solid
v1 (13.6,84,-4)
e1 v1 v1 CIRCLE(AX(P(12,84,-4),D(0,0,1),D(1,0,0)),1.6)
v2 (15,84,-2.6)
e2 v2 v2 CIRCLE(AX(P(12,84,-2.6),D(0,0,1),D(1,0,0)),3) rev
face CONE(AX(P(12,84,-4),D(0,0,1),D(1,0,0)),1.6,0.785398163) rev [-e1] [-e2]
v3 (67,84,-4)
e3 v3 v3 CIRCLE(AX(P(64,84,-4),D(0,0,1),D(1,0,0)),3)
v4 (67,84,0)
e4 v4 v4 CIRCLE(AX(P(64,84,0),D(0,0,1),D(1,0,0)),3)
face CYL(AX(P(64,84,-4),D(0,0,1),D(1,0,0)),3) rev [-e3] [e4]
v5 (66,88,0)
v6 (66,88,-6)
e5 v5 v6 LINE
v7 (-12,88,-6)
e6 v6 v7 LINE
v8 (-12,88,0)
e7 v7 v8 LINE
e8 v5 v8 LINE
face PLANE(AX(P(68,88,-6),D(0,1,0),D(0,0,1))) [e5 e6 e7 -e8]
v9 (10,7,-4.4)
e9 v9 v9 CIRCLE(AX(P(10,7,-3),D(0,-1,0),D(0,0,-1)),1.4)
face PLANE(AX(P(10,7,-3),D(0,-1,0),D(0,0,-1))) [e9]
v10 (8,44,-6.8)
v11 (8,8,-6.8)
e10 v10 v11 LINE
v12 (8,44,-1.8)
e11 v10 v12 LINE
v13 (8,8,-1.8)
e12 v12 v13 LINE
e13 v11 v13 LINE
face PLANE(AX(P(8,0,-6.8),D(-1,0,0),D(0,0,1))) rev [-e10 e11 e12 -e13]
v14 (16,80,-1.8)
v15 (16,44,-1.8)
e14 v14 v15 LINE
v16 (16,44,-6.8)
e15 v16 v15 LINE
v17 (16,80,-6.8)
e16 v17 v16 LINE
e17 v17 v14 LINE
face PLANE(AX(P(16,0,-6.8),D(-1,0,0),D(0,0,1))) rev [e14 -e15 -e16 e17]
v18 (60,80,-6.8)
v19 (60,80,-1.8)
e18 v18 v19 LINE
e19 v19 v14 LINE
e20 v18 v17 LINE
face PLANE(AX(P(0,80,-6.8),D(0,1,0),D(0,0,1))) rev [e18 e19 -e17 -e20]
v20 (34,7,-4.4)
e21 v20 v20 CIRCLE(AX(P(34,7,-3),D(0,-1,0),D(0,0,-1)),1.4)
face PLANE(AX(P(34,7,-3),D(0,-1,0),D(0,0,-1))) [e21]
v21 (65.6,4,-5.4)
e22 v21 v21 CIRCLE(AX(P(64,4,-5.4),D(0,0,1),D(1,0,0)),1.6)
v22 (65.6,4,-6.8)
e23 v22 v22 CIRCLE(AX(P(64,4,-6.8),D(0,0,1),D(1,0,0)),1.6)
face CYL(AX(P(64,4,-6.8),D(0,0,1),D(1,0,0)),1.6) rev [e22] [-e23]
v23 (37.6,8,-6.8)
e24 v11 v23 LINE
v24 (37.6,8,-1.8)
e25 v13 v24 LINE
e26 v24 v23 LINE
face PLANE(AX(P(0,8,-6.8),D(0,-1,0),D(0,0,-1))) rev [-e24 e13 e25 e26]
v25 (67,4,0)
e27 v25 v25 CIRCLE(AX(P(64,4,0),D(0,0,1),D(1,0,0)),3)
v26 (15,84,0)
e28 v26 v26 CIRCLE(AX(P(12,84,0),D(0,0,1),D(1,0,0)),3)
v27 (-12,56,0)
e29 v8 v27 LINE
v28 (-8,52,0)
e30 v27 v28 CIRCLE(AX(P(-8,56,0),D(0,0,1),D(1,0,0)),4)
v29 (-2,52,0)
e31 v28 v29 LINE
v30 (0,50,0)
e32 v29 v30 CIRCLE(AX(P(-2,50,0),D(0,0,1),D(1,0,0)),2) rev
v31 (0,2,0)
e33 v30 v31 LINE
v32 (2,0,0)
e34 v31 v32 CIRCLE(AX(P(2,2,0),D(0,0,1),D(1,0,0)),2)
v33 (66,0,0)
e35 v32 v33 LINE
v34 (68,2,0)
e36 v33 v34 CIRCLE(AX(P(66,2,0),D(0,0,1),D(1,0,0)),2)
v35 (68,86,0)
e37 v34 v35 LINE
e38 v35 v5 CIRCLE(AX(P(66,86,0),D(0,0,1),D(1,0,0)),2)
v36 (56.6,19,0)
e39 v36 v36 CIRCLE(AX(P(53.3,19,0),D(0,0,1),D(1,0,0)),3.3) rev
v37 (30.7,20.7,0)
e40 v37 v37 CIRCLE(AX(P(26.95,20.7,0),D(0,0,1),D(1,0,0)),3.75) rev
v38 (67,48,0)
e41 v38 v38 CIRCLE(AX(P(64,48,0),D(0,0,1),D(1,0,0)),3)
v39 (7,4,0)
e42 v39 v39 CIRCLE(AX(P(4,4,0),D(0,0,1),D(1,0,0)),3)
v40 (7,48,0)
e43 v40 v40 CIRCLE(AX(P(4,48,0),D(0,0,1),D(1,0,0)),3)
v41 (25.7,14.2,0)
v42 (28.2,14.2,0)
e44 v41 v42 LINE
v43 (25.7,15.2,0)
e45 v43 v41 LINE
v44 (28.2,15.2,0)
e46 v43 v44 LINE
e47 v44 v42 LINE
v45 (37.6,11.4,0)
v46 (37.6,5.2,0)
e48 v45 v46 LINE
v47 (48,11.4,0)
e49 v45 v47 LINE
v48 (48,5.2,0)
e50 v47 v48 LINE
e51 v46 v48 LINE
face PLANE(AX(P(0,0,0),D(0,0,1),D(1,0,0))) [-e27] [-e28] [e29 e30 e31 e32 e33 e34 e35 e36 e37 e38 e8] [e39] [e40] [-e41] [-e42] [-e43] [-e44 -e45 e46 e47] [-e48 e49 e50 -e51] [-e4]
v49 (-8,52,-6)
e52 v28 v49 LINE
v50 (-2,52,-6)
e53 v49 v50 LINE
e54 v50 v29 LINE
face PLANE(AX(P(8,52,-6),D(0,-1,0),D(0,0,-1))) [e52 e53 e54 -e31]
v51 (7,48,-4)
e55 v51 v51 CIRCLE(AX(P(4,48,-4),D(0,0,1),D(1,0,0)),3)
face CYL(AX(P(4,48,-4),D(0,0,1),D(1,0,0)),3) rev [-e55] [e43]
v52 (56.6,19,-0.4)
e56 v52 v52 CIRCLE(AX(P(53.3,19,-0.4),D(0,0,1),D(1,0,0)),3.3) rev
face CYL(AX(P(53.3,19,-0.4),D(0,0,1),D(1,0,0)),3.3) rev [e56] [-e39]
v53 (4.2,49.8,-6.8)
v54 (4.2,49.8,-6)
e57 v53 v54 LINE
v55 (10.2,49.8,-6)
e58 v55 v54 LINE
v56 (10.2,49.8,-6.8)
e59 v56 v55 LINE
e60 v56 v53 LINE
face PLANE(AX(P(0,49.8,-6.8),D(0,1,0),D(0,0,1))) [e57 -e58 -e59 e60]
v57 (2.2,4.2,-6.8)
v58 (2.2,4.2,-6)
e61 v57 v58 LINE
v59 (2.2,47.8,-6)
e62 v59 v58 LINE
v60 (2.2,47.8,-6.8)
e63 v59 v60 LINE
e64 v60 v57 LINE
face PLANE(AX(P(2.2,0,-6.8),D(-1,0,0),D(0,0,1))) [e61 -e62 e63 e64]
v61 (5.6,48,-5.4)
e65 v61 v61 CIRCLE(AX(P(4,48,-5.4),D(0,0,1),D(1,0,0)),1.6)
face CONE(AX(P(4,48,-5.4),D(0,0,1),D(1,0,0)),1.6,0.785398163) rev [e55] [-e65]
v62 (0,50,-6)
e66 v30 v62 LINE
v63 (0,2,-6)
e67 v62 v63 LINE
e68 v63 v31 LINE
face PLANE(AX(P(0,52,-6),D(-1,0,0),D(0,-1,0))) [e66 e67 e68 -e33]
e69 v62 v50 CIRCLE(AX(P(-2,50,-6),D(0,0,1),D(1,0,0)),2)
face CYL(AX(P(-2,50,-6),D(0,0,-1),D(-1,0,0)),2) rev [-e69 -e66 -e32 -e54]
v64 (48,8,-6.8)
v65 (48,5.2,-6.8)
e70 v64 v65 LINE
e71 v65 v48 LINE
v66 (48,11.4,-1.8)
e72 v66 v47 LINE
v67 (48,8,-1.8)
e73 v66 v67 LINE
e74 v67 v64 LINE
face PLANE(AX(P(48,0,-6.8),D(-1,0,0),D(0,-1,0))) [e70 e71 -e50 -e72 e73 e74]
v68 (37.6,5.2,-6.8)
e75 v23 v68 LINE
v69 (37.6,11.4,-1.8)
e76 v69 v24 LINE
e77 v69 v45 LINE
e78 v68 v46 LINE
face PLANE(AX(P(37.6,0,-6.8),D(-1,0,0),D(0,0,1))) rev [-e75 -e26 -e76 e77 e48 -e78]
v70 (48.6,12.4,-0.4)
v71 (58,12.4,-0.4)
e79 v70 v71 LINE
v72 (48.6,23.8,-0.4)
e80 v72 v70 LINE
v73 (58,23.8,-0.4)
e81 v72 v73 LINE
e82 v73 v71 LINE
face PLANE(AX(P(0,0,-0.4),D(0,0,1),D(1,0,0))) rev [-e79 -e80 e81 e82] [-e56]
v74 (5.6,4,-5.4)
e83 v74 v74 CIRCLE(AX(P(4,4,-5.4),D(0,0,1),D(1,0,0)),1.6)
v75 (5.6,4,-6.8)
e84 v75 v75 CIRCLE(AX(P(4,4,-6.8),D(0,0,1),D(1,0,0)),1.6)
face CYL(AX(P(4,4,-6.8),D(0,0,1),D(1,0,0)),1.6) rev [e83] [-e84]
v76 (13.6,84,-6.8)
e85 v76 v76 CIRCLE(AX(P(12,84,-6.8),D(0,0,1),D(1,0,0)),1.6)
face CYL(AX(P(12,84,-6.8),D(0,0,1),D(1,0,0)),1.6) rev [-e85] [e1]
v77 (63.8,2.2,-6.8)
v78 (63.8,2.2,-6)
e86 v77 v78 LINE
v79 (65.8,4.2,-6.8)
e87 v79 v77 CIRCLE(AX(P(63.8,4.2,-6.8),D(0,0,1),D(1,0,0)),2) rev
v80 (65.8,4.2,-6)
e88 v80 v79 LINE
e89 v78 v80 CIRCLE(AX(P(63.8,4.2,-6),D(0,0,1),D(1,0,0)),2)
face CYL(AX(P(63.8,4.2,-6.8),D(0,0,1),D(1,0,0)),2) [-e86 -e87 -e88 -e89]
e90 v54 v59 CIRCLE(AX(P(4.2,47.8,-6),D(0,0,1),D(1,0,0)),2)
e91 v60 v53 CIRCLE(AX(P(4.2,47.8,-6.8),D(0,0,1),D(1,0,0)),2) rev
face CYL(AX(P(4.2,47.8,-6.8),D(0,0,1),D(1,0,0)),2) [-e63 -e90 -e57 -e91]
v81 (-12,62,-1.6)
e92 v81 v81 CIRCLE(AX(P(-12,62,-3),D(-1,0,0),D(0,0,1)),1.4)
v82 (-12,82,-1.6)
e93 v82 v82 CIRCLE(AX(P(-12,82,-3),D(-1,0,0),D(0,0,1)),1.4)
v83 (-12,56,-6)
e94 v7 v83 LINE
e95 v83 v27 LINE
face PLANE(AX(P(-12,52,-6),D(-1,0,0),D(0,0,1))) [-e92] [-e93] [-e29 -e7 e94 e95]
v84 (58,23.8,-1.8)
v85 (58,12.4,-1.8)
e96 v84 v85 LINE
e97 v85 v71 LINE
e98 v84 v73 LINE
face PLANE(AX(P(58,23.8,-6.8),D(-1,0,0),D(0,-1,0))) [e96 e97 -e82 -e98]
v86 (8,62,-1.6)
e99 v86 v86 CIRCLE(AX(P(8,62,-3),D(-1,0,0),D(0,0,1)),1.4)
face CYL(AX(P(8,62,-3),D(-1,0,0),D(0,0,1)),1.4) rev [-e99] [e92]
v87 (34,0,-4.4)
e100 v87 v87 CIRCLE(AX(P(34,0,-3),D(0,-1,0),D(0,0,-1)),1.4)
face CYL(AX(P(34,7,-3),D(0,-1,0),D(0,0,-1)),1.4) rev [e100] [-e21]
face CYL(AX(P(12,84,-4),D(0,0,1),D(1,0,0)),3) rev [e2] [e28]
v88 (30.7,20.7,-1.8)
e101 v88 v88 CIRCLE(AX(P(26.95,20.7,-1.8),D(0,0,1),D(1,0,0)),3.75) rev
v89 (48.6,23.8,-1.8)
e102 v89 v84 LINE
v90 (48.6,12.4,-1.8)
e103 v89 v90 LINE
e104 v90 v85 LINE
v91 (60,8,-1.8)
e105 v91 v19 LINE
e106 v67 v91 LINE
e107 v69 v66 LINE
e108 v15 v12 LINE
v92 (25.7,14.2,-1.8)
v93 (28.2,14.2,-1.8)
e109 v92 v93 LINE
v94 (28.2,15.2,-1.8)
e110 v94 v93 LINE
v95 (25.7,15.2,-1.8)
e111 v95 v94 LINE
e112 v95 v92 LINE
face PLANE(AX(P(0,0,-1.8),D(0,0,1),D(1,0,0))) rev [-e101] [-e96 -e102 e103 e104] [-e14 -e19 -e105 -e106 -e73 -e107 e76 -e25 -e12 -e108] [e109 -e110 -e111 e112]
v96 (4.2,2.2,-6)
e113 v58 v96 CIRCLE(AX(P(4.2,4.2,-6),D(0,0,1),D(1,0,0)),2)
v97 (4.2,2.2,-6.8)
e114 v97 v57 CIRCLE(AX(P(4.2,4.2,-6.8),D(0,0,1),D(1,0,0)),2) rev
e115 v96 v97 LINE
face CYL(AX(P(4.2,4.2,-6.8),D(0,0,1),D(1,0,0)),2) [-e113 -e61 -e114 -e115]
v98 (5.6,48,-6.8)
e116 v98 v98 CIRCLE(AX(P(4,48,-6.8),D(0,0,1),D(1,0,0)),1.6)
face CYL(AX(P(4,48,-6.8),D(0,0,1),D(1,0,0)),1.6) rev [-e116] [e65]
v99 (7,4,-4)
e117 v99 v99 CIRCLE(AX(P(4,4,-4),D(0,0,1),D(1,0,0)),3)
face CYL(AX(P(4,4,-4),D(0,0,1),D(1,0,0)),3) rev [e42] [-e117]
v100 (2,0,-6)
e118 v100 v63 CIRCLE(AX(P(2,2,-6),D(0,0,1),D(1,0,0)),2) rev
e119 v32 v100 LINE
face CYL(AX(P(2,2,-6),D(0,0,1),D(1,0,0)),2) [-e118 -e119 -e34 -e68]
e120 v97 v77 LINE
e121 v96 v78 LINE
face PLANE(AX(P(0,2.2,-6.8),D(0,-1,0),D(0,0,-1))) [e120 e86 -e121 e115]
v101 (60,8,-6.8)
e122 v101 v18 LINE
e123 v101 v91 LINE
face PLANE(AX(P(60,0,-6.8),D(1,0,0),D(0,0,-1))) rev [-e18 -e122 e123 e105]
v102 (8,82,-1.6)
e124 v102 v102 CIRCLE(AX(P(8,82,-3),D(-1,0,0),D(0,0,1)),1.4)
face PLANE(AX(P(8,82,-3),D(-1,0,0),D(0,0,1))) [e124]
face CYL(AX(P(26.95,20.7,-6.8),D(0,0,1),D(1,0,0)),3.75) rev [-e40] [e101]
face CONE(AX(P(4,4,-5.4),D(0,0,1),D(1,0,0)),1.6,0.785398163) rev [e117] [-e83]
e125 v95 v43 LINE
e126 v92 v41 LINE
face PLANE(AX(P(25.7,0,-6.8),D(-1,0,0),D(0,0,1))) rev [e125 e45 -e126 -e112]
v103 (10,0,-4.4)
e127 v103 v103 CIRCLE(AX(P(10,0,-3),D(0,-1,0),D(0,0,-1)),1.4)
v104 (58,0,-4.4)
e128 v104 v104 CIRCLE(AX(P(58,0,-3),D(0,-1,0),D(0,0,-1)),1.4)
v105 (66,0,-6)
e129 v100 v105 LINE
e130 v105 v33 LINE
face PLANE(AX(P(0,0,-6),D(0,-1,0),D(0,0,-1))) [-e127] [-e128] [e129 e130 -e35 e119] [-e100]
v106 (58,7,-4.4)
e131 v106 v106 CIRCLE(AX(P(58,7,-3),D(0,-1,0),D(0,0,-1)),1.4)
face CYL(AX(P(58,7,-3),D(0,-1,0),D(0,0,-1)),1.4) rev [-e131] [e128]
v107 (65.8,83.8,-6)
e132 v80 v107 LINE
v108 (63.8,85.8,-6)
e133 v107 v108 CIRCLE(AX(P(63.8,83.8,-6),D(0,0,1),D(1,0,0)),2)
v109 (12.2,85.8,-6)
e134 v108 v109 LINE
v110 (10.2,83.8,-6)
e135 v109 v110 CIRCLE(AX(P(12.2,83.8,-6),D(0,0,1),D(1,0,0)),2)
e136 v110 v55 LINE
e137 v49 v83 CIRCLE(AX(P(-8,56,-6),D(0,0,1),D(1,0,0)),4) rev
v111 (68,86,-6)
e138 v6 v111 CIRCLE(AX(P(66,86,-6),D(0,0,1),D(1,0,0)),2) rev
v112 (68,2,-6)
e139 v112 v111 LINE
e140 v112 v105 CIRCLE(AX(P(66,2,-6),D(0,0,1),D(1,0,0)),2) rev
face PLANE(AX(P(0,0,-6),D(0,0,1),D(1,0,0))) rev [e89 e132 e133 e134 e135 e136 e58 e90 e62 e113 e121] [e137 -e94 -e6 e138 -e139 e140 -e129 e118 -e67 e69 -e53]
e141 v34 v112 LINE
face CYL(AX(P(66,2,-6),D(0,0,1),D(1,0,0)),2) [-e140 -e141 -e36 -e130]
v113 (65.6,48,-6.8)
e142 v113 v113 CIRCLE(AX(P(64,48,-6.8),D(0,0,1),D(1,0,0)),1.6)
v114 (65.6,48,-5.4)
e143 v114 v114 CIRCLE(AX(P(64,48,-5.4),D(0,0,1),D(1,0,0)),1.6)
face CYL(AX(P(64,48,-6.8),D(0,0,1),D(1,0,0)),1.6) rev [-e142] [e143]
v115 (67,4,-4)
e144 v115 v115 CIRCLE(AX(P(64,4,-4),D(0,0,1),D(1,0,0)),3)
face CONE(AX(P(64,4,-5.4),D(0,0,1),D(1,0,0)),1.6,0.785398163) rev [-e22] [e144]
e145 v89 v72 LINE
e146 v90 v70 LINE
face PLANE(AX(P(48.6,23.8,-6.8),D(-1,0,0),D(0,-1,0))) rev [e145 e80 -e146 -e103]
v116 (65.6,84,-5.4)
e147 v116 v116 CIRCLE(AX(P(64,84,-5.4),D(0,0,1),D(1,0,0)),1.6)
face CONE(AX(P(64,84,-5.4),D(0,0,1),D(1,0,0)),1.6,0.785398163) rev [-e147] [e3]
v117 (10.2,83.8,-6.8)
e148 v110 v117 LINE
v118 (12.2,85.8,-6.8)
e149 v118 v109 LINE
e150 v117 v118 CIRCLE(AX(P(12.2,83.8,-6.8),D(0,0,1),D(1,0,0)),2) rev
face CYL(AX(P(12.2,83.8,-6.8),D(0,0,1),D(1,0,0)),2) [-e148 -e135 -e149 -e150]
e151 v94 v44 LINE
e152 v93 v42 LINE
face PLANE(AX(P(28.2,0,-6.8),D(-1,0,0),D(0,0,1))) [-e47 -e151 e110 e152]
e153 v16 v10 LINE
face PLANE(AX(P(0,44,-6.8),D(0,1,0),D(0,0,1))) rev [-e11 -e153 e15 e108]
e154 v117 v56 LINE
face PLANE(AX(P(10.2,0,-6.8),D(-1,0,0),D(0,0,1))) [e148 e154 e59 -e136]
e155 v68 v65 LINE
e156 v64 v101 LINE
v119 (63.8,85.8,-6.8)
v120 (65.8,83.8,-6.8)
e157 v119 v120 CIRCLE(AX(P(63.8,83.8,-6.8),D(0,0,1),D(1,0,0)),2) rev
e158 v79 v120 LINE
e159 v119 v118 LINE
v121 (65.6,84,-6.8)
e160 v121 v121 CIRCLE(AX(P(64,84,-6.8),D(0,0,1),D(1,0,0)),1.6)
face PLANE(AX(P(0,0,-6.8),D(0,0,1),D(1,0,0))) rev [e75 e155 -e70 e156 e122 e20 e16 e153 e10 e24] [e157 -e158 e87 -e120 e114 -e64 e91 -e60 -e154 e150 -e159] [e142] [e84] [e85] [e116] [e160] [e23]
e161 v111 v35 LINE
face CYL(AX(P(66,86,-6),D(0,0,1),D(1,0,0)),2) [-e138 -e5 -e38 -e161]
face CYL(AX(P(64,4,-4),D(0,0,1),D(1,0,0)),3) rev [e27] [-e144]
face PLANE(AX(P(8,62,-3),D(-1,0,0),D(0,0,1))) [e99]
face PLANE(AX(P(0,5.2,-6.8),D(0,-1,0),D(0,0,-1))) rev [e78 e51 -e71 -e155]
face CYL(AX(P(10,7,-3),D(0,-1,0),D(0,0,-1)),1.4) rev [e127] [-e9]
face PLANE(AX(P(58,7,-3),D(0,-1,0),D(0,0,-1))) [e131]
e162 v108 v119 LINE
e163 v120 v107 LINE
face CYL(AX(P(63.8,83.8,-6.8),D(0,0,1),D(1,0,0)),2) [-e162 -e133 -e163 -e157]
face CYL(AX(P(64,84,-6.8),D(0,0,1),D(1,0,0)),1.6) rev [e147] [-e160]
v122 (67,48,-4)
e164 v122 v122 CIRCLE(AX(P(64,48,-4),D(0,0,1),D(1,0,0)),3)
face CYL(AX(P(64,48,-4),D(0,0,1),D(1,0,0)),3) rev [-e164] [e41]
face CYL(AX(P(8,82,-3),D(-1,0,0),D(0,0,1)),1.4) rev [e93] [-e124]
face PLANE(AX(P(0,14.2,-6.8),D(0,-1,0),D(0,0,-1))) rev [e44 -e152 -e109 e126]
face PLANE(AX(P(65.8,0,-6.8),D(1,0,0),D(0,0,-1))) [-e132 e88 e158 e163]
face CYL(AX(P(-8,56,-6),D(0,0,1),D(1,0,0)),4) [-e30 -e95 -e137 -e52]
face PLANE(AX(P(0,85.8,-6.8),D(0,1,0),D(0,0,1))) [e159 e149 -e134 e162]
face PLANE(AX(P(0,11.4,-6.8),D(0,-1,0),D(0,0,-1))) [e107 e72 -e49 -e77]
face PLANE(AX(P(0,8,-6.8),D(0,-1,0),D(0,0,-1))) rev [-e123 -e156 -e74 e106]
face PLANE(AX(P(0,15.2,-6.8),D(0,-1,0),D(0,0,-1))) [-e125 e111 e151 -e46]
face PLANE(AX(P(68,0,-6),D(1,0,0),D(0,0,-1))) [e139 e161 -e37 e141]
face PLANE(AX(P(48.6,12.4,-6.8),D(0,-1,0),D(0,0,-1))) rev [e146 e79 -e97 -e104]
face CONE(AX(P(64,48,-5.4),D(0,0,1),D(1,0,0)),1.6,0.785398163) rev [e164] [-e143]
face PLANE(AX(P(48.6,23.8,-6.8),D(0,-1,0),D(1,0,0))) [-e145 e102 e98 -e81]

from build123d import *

# Parameters (mm, degrees)
EXTRUDE_1_DEPTH          = 6
EXTRUDE_4_DEPTH          = 6.8
CUT_EXTRUDE_START        = -1.8
CUT_EXTRUDE_6_DEPTH      = 110.619208398
FILLET_1_R               = 2
CUT_EXTRUDE_4_DEPTH      = 112.419208398
CUT_EXTRUDE_4_DEPTH_BACK = 112.419208398
SKETCH_4_R               = 1.6
SKETCH_5_R               = 3.75
SKETCH_5_W               = 10.4
SKETCH_5_H               = 6.2
SKETCH_5_W_2             = 2.5
SKETCH_5_H_2             = 1
SKETCH_5_W_3             = 9.4
SKETCH_5_H_3             = 11.4
CUT_EXTRUDE_5_DEPTH      = 112.419208398
SKETCH_5_3_W             = 9.4
SKETCH_5_3_H             = 11.4
SKETCH_5_3_R             = 3.3
EXTRUDE_5_DEPTH          = 0.4
SKETCH_6_W               = 20
SKETCH_6_H               = 36
EXTRUDE_7_DEPTH          = 6
FILLET_2_R               = 2
FILLET_3_R               = 4
SKETCH_7_R               = 1.4
CUT_EXTRUDE_7_DEPTH      = 20
SKETCH_4_3_R             = 3
SKETCH_4_3_R_2           = 1.6
CUT_EXTRUDE_8_DEPTH      = 4
SKETCH_8_R               = 1.4
CUT_EXTRUDE_9_DEPTH      = 7
CHAMFER_1_SIZE           = 1.4


with BuildPart() as part:
    # 草图1 → 凸台-拉伸1 (new body)
    with BuildSketch(Plane.XY):
        Polygon((0, 0), (68, 0), (68, 88), (8, 88), (8, 52), (0, 52), align=None)
    extrude(amount=-EXTRUDE_1_DEPTH)

    # 草图1<2> → 凸台-拉伸4 (add)
    with BuildSketch(Plane.XY):
        Polygon((2.2, 49.8), (2.2, 2.2), (65.8, 2.2), (65.8, 85.8), (10.2, 85.8), (10.2, 49.8), align=None)
        Polygon((8, 44), (8, 8), (60, 8), (60, 80), (16, 80), (16, 44), align=None, mode=Mode.SUBTRACT)
    extrude(amount=-EXTRUDE_4_DEPTH)

    # 草图1<5> → 切除-拉伸6 (cut, through all)
    with BuildSketch(Plane.XY.offset(CUT_EXTRUDE_START)):
        Polygon((16, 80), (16, 44), (8, 44), (8, 8), (60, 8), (60, 80), align=None)
    extrude(amount=-CUT_EXTRUDE_6_DEPTH, mode=Mode.SUBTRACT)

    # 圆角1
    fillet_1_edges = [part.edges().sort_by_distance(p)[0] for p in [
        (68, 88, -3),
        (68, 0, -3),
        (0, 0, -3),
        (10.2, 85.8, -6.4),
        (65.8, 85.8, -6.4),
        (65.8, 2.2, -6.4),
        (2.2, 2.2, -6.4),
        (2.2, 49.8, -6.4),
    ]]
    fillet(fillet_1_edges, radius=FILLET_1_R)

    # 草图4 → 切除-拉伸4 (cut, two sides: drawn at the far end of the back side and taken through both)
    with BuildSketch(Plane.XY.offset(-CUT_EXTRUDE_4_DEPTH_BACK)):
        with Locations((12, 84)):
            Circle(SKETCH_4_R)
        with Locations((64, 84)):
            Circle(SKETCH_4_R)
        with Locations((64, 4)):
            Circle(SKETCH_4_R)
        with Locations((4, 48)):
            Circle(SKETCH_4_R)
        with Locations((4, 4)):
            Circle(SKETCH_4_R)
        with Locations((64, 48)):
            Circle(SKETCH_4_R)
    extrude(amount=CUT_EXTRUDE_4_DEPTH + CUT_EXTRUDE_4_DEPTH_BACK, mode=Mode.SUBTRACT)

    # 草图5 → 切除-拉伸5 (cut, through all)
    with BuildSketch(Plane.XY):
        with Locations((26.95, 20.7)):
            Circle(SKETCH_5_R)
        with Locations((42.8, 8.3)):
            Rectangle(SKETCH_5_W, SKETCH_5_H)
        with Locations((26.95, 14.7)):
            Rectangle(SKETCH_5_W_2, SKETCH_5_H_2)
        with Locations((53.3, 18.1)):
            Rectangle(SKETCH_5_W_3, SKETCH_5_H_3)
    extrude(amount=-CUT_EXTRUDE_5_DEPTH, mode=Mode.SUBTRACT)

    # 草图5<3> → 凸台-拉伸5 (add)
    with BuildSketch(Plane.XY):
        with Locations((53.3, 18.1)):
            Rectangle(SKETCH_5_3_W, SKETCH_5_3_H)
        with Locations((53.3, 19)):
            Circle(SKETCH_5_3_R, mode=Mode.SUBTRACT)
    extrude(amount=-EXTRUDE_5_DEPTH)

    # 草图6 → 凸台-拉伸7 (add)
    with BuildSketch(Plane.XY):
        with Locations((-2, 70)):
            Rectangle(SKETCH_6_W, SKETCH_6_H)
    extrude(amount=-EXTRUDE_7_DEPTH)

    # 圆角2
    fillet_2_edges = [part.edges().sort_by_distance(p)[0] for p in [
        (0, 52, -3),
    ]]
    fillet(fillet_2_edges, radius=FILLET_2_R)

    # 圆角3
    fillet_3_edges = [part.edges().sort_by_distance(p)[0] for p in [
        (-12, 52, -3),
    ]]
    fillet(fillet_3_edges, radius=FILLET_3_R)

    # 草图7 → 切除-拉伸7 (cut)
    with BuildSketch(Plane.ZY.offset(12)):
        with Locations((-3, 82)):
            Circle(SKETCH_7_R)
        with Locations((-3, 62)):
            Circle(SKETCH_7_R)
    extrude(amount=-CUT_EXTRUDE_7_DEPTH, mode=Mode.SUBTRACT)

    # 草图4<3> → 切除-拉伸8 (cut)
    # profile 1 of 6: a face of its own
    with BuildSketch(Plane.XY):
        with Locations((12, 84)):
            Circle(SKETCH_4_3_R)
        with Locations((12, 84)):
            Circle(SKETCH_4_3_R_2, mode=Mode.SUBTRACT)
    # profile 2 of 6: a face of its own
    with BuildSketch(Plane.XY):
        with Locations((64, 84)):
            Circle(SKETCH_4_3_R)
        with Locations((64, 84)):
            Circle(SKETCH_4_3_R_2, mode=Mode.SUBTRACT)
    # profile 3 of 6: a face of its own
    with BuildSketch(Plane.XY):
        with Locations((4, 48)):
            Circle(SKETCH_4_3_R)
        with Locations((4, 48)):
            Circle(SKETCH_4_3_R_2, mode=Mode.SUBTRACT)
    # profile 4 of 6: a face of its own
    with BuildSketch(Plane.XY):
        with Locations((64, 48)):
            Circle(SKETCH_4_3_R)
        with Locations((64, 48)):
            Circle(SKETCH_4_3_R_2, mode=Mode.SUBTRACT)
    # profile 5 of 6: a face of its own
    with BuildSketch(Plane.XY):
        with Locations((4, 4)):
            Circle(SKETCH_4_3_R)
        with Locations((4, 4)):
            Circle(SKETCH_4_3_R_2, mode=Mode.SUBTRACT)
    # profile 6 of 6: a face of its own
    with BuildSketch(Plane.XY):
        with Locations((64, 4)):
            Circle(SKETCH_4_3_R)
        with Locations((64, 4)):
            Circle(SKETCH_4_3_R_2, mode=Mode.SUBTRACT)
    extrude(amount=-CUT_EXTRUDE_8_DEPTH, mode=Mode.SUBTRACT)

    # 草图8 → 切除-拉伸9 (cut)
    with BuildSketch(Plane.XZ):
        with Locations(Location((58, -3, 0), (0, 0, 270))):
            Circle(SKETCH_8_R)
        with Locations(Location((10, -3, 0), (0, 0, 270))):
            Circle(SKETCH_8_R)
        with Locations(Location((34, -3, 0), (0, 0, 270))):
            Circle(SKETCH_8_R)
    extrude(amount=-CUT_EXTRUDE_9_DEPTH, mode=Mode.SUBTRACT)

    # 倒角1
    chamfer_1_edges = [part.edges().sort_by_distance(p)[0] for p in [
        (2.4, 4, -4),
        (62.4, 48, -4),
        (2.4, 48, -4),
        (62.4, 84, -4),
        (62.4, 4, -4),
        (9, 84, -4),
    ]]
    chamfer(chamfer_1_edges, length=CHAMFER_1_SIZE - 0.0001)  # a hair under: the kernel refuses the full size


solid = part.part
